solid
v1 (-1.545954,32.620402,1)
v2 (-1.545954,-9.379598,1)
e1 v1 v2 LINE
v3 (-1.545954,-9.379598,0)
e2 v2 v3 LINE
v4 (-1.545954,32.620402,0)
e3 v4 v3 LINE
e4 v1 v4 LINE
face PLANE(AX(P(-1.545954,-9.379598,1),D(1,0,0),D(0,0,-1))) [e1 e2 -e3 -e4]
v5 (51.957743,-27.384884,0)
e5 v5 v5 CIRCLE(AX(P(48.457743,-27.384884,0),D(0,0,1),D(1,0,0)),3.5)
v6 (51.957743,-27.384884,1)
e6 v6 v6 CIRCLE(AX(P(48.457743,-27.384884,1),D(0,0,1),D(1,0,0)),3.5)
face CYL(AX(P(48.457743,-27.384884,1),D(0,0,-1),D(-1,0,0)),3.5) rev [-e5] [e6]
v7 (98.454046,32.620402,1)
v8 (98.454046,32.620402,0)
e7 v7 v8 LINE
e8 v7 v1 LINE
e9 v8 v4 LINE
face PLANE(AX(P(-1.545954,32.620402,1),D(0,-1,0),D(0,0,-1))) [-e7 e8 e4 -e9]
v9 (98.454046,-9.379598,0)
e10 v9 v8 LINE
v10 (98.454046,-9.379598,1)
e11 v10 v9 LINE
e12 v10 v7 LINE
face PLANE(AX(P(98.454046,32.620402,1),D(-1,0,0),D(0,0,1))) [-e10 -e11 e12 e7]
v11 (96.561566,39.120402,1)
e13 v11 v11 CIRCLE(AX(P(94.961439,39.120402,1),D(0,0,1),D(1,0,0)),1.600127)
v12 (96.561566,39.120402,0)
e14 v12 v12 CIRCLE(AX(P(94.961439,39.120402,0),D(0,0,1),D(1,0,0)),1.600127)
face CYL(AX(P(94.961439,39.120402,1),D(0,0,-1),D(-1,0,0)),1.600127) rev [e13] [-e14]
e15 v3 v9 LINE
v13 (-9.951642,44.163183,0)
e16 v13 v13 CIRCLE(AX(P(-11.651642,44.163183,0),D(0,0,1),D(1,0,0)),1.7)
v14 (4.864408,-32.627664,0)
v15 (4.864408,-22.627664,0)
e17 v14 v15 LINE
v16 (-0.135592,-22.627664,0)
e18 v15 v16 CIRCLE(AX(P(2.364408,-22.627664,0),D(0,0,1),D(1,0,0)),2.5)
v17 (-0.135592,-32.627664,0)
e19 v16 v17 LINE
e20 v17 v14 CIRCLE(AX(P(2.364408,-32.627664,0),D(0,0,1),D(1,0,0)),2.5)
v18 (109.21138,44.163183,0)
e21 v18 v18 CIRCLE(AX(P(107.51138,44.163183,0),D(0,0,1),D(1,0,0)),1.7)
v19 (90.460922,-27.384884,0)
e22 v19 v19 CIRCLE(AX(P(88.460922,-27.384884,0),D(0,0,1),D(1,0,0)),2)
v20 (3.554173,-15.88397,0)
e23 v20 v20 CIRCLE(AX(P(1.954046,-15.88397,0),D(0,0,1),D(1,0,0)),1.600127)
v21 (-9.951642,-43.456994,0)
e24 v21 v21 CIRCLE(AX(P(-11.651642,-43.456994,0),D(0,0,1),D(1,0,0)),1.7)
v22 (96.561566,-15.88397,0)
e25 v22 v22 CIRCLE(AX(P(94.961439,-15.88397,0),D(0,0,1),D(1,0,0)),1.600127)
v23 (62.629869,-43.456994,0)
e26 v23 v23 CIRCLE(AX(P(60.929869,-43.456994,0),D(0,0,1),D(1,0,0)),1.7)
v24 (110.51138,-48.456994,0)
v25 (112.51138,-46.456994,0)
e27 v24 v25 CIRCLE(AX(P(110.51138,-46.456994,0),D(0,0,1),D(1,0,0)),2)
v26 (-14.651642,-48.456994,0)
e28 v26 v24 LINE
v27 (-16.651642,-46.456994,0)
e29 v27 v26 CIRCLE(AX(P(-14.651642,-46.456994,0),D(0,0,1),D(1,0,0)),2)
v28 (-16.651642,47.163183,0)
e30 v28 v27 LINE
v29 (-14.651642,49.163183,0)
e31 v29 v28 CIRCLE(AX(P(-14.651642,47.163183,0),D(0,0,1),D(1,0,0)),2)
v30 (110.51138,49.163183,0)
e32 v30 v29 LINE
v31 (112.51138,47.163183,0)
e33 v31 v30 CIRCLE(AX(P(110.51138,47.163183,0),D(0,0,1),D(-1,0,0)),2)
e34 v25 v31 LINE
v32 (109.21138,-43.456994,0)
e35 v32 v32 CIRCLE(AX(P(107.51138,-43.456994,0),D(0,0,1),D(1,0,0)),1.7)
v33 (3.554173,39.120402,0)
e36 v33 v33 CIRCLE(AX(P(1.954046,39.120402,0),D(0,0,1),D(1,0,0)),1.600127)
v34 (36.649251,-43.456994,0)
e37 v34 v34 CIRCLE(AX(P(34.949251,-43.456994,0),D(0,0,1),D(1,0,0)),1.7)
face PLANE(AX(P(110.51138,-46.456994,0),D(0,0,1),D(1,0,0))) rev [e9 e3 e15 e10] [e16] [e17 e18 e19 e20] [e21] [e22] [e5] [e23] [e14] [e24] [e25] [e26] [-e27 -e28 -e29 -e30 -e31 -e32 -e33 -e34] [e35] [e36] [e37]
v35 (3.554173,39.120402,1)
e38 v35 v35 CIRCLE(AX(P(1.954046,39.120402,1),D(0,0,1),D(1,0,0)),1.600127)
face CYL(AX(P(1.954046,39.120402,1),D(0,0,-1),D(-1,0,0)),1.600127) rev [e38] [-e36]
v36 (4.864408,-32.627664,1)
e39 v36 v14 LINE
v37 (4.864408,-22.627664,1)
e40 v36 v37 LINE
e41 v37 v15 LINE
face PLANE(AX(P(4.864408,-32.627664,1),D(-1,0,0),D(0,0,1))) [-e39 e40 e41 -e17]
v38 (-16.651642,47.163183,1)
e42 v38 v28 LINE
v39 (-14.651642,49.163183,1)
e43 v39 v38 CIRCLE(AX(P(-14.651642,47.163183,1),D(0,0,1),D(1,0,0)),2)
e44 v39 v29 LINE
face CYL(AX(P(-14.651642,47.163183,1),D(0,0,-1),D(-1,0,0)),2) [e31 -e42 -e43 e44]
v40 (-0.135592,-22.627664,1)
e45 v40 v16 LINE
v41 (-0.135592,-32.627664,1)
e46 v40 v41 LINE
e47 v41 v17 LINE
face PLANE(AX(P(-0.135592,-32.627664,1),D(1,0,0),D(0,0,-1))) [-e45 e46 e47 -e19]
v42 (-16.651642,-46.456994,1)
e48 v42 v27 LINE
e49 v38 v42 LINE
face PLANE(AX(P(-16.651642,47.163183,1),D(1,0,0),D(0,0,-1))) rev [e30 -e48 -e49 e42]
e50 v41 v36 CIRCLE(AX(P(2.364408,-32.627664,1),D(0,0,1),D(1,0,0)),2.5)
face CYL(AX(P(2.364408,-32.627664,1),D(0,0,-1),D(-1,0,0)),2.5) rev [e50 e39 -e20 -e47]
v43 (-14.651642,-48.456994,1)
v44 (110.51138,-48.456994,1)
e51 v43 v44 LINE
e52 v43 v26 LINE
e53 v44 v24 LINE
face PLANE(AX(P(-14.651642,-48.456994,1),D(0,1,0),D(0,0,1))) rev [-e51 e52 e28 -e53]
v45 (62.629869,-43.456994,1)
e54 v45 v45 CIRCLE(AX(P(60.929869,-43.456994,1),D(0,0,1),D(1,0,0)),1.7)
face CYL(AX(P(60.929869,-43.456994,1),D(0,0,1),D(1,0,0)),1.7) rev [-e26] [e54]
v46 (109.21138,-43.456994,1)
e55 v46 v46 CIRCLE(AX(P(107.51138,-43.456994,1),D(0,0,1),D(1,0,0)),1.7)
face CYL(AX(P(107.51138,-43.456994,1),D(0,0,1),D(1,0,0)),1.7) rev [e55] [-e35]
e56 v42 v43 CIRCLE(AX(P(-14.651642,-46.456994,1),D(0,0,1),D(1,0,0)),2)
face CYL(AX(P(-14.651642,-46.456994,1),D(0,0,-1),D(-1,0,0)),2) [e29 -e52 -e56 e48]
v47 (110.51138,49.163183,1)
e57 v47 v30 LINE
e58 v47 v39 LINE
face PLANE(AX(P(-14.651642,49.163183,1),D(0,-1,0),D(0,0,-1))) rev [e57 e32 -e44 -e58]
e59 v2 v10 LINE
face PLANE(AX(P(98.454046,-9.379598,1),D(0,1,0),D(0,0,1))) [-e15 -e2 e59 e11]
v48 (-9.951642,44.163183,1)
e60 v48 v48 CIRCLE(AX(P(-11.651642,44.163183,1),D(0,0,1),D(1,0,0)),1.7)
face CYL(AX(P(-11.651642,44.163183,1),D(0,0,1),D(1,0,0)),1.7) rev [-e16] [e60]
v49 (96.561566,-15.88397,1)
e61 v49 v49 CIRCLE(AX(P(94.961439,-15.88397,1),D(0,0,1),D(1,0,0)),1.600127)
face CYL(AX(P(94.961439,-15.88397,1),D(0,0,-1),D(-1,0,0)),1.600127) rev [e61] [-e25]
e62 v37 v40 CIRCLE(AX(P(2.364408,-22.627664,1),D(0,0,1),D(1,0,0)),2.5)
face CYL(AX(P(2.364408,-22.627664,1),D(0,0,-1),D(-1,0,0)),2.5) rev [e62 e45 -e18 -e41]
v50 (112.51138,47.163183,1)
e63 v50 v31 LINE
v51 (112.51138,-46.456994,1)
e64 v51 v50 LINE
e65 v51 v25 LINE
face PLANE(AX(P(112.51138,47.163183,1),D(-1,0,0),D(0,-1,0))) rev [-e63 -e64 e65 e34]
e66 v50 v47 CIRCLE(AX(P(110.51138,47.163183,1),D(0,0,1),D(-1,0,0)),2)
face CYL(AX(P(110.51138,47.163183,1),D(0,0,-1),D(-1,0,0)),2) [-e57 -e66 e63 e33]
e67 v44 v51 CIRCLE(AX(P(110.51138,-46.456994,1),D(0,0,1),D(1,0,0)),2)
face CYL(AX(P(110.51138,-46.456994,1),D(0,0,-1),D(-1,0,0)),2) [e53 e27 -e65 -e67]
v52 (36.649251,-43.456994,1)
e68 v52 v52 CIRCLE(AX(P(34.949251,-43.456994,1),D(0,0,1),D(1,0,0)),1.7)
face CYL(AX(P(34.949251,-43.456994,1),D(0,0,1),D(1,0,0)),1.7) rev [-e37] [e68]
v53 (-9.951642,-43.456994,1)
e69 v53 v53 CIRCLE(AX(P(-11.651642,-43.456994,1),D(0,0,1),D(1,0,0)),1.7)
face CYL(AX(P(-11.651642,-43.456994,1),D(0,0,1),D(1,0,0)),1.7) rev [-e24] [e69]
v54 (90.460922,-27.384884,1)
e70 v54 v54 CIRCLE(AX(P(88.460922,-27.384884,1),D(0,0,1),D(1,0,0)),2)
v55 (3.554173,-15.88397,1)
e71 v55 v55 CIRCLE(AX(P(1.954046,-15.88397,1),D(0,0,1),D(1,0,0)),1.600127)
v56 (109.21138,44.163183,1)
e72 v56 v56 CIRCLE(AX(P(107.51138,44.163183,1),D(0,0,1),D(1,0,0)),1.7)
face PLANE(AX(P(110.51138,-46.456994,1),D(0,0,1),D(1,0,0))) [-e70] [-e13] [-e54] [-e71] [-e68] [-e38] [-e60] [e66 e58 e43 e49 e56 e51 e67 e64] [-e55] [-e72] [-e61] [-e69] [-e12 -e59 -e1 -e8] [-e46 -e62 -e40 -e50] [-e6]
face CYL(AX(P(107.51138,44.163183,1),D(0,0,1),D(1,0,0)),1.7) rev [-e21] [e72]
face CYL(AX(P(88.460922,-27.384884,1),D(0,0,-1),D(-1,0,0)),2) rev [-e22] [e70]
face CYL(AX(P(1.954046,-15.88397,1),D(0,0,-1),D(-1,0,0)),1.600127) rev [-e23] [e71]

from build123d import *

# Parameters (mm, degrees)
BOSS_EXTRUDE1_OUTLINE_R   = 1.600127185
BOSS_EXTRUDE1_OUTLINE_R_2 = 3.5
BOSS_EXTRUDE1_OUTLINE_R_3 = 2
BOSS_EXTRUDE1_OUTLINE_W   = 100
BOSS_EXTRUDE1_OUTLINE_H   = 42
BOSS_EXTRUDE1_DEPTH       = 1
M3_CLEARANCE_HOLE1_D      = 3.4
M3_CLEARANCE_HOLE1_DEPTH  = 4
M3_CLEARANCE_HOLE1_TIP    = 1.021463052


# Read off the part's stored shape, not the designer's step: Boss-Extrude1
with BuildPart() as part:
    # Boss-Extrude1 outline → Boss-Extrude1 (new body)
    with BuildSketch(Plane.XY):
        with BuildLine():
            ThreePointArc((110.511379674, -48.456994218), (111.925593237, -47.871207781), (112.511379674, -46.456994218))
            Line((112.511379674, -46.456994218), (112.511379674, 47.163183245))
            ThreePointArc((112.511379674, 47.163183245), (111.925593236, 48.577396807), (110.511379674, 49.163183245))
            Line((110.511379674, 49.163183245), (-14.651641589, 49.163183245))
            ThreePointArc((-14.651641589, 49.163183245), (-16.065855151, 48.577396807), (-16.651641589, 47.163183245))
            Line((-16.651641589, 47.163183245), (-16.651641589, -46.456994218))
            ThreePointArc((-16.651641589, -46.456994218), (-16.065855152, -47.871207781), (-14.651641589, -48.456994218))
            Line((-14.651641589, -48.456994218), (110.511379674, -48.456994218))
        make_face()
        with BuildLine():
            Line((4.864408455, -22.627663705), (4.864408455, -32.627663705))
            ThreePointArc((4.864408455, -32.627663705), (2.364408455, -35.127663705), (-0.135591545, -32.627663705))
            Line((-0.135591545, -32.627663705), (-0.135591545, -22.627663705))
            ThreePointArc((-0.135591545, -22.627663705), (2.364408455, -20.127663705), (4.864408455, -22.627663705))
        make_face(mode=Mode.SUBTRACT)
        with Locations((1.954046296, -15.88396989)):
            Circle(BOSS_EXTRUDE1_OUTLINE_R, mode=Mode.SUBTRACT)
        with Locations((48.457742604, -27.384884031)):
            Circle(BOSS_EXTRUDE1_OUTLINE_R_2, mode=Mode.SUBTRACT)
        with Locations((88.460922224, -27.384884031)):
            Circle(BOSS_EXTRUDE1_OUTLINE_R_3, mode=Mode.SUBTRACT)
        with Locations((94.961438913, -15.88396989)):
            Circle(BOSS_EXTRUDE1_OUTLINE_R, mode=Mode.SUBTRACT)
        with Locations((1.954046296, 39.120402088)):
            Circle(BOSS_EXTRUDE1_OUTLINE_R, mode=Mode.SUBTRACT)
        with Locations((48.454046296, 11.620402088)):
            Rectangle(BOSS_EXTRUDE1_OUTLINE_W, BOSS_EXTRUDE1_OUTLINE_H, mode=Mode.SUBTRACT)
        with Locations((94.961438913, 39.120402088)):
            Circle(BOSS_EXTRUDE1_OUTLINE_R, mode=Mode.SUBTRACT)
    extrude(amount=BOSS_EXTRUDE1_DEPTH)

    # M3 Clearance Hole1
    with Locations(Plane.XY.offset(1)):
        with Locations((-11.651641589, 44.163183245), (-11.651641589, -43.456994218), (107.511379674, -43.456994218), (107.511379674, 44.163183245), (34.949251299, -43.456994218), (60.929869042, -43.456994218)):
            Hole(M3_CLEARANCE_HOLE1_D / 2, depth=M3_CLEARANCE_HOLE1_DEPTH)
            with Locations((0, 0, -(M3_CLEARANCE_HOLE1_DEPTH + M3_CLEARANCE_HOLE1_TIP / 2))):  # 118° drill point
                Cone(0, M3_CLEARANCE_HOLE1_D / 2, M3_CLEARANCE_HOLE1_TIP, mode=Mode.SUBTRACT)


solid = part.part
